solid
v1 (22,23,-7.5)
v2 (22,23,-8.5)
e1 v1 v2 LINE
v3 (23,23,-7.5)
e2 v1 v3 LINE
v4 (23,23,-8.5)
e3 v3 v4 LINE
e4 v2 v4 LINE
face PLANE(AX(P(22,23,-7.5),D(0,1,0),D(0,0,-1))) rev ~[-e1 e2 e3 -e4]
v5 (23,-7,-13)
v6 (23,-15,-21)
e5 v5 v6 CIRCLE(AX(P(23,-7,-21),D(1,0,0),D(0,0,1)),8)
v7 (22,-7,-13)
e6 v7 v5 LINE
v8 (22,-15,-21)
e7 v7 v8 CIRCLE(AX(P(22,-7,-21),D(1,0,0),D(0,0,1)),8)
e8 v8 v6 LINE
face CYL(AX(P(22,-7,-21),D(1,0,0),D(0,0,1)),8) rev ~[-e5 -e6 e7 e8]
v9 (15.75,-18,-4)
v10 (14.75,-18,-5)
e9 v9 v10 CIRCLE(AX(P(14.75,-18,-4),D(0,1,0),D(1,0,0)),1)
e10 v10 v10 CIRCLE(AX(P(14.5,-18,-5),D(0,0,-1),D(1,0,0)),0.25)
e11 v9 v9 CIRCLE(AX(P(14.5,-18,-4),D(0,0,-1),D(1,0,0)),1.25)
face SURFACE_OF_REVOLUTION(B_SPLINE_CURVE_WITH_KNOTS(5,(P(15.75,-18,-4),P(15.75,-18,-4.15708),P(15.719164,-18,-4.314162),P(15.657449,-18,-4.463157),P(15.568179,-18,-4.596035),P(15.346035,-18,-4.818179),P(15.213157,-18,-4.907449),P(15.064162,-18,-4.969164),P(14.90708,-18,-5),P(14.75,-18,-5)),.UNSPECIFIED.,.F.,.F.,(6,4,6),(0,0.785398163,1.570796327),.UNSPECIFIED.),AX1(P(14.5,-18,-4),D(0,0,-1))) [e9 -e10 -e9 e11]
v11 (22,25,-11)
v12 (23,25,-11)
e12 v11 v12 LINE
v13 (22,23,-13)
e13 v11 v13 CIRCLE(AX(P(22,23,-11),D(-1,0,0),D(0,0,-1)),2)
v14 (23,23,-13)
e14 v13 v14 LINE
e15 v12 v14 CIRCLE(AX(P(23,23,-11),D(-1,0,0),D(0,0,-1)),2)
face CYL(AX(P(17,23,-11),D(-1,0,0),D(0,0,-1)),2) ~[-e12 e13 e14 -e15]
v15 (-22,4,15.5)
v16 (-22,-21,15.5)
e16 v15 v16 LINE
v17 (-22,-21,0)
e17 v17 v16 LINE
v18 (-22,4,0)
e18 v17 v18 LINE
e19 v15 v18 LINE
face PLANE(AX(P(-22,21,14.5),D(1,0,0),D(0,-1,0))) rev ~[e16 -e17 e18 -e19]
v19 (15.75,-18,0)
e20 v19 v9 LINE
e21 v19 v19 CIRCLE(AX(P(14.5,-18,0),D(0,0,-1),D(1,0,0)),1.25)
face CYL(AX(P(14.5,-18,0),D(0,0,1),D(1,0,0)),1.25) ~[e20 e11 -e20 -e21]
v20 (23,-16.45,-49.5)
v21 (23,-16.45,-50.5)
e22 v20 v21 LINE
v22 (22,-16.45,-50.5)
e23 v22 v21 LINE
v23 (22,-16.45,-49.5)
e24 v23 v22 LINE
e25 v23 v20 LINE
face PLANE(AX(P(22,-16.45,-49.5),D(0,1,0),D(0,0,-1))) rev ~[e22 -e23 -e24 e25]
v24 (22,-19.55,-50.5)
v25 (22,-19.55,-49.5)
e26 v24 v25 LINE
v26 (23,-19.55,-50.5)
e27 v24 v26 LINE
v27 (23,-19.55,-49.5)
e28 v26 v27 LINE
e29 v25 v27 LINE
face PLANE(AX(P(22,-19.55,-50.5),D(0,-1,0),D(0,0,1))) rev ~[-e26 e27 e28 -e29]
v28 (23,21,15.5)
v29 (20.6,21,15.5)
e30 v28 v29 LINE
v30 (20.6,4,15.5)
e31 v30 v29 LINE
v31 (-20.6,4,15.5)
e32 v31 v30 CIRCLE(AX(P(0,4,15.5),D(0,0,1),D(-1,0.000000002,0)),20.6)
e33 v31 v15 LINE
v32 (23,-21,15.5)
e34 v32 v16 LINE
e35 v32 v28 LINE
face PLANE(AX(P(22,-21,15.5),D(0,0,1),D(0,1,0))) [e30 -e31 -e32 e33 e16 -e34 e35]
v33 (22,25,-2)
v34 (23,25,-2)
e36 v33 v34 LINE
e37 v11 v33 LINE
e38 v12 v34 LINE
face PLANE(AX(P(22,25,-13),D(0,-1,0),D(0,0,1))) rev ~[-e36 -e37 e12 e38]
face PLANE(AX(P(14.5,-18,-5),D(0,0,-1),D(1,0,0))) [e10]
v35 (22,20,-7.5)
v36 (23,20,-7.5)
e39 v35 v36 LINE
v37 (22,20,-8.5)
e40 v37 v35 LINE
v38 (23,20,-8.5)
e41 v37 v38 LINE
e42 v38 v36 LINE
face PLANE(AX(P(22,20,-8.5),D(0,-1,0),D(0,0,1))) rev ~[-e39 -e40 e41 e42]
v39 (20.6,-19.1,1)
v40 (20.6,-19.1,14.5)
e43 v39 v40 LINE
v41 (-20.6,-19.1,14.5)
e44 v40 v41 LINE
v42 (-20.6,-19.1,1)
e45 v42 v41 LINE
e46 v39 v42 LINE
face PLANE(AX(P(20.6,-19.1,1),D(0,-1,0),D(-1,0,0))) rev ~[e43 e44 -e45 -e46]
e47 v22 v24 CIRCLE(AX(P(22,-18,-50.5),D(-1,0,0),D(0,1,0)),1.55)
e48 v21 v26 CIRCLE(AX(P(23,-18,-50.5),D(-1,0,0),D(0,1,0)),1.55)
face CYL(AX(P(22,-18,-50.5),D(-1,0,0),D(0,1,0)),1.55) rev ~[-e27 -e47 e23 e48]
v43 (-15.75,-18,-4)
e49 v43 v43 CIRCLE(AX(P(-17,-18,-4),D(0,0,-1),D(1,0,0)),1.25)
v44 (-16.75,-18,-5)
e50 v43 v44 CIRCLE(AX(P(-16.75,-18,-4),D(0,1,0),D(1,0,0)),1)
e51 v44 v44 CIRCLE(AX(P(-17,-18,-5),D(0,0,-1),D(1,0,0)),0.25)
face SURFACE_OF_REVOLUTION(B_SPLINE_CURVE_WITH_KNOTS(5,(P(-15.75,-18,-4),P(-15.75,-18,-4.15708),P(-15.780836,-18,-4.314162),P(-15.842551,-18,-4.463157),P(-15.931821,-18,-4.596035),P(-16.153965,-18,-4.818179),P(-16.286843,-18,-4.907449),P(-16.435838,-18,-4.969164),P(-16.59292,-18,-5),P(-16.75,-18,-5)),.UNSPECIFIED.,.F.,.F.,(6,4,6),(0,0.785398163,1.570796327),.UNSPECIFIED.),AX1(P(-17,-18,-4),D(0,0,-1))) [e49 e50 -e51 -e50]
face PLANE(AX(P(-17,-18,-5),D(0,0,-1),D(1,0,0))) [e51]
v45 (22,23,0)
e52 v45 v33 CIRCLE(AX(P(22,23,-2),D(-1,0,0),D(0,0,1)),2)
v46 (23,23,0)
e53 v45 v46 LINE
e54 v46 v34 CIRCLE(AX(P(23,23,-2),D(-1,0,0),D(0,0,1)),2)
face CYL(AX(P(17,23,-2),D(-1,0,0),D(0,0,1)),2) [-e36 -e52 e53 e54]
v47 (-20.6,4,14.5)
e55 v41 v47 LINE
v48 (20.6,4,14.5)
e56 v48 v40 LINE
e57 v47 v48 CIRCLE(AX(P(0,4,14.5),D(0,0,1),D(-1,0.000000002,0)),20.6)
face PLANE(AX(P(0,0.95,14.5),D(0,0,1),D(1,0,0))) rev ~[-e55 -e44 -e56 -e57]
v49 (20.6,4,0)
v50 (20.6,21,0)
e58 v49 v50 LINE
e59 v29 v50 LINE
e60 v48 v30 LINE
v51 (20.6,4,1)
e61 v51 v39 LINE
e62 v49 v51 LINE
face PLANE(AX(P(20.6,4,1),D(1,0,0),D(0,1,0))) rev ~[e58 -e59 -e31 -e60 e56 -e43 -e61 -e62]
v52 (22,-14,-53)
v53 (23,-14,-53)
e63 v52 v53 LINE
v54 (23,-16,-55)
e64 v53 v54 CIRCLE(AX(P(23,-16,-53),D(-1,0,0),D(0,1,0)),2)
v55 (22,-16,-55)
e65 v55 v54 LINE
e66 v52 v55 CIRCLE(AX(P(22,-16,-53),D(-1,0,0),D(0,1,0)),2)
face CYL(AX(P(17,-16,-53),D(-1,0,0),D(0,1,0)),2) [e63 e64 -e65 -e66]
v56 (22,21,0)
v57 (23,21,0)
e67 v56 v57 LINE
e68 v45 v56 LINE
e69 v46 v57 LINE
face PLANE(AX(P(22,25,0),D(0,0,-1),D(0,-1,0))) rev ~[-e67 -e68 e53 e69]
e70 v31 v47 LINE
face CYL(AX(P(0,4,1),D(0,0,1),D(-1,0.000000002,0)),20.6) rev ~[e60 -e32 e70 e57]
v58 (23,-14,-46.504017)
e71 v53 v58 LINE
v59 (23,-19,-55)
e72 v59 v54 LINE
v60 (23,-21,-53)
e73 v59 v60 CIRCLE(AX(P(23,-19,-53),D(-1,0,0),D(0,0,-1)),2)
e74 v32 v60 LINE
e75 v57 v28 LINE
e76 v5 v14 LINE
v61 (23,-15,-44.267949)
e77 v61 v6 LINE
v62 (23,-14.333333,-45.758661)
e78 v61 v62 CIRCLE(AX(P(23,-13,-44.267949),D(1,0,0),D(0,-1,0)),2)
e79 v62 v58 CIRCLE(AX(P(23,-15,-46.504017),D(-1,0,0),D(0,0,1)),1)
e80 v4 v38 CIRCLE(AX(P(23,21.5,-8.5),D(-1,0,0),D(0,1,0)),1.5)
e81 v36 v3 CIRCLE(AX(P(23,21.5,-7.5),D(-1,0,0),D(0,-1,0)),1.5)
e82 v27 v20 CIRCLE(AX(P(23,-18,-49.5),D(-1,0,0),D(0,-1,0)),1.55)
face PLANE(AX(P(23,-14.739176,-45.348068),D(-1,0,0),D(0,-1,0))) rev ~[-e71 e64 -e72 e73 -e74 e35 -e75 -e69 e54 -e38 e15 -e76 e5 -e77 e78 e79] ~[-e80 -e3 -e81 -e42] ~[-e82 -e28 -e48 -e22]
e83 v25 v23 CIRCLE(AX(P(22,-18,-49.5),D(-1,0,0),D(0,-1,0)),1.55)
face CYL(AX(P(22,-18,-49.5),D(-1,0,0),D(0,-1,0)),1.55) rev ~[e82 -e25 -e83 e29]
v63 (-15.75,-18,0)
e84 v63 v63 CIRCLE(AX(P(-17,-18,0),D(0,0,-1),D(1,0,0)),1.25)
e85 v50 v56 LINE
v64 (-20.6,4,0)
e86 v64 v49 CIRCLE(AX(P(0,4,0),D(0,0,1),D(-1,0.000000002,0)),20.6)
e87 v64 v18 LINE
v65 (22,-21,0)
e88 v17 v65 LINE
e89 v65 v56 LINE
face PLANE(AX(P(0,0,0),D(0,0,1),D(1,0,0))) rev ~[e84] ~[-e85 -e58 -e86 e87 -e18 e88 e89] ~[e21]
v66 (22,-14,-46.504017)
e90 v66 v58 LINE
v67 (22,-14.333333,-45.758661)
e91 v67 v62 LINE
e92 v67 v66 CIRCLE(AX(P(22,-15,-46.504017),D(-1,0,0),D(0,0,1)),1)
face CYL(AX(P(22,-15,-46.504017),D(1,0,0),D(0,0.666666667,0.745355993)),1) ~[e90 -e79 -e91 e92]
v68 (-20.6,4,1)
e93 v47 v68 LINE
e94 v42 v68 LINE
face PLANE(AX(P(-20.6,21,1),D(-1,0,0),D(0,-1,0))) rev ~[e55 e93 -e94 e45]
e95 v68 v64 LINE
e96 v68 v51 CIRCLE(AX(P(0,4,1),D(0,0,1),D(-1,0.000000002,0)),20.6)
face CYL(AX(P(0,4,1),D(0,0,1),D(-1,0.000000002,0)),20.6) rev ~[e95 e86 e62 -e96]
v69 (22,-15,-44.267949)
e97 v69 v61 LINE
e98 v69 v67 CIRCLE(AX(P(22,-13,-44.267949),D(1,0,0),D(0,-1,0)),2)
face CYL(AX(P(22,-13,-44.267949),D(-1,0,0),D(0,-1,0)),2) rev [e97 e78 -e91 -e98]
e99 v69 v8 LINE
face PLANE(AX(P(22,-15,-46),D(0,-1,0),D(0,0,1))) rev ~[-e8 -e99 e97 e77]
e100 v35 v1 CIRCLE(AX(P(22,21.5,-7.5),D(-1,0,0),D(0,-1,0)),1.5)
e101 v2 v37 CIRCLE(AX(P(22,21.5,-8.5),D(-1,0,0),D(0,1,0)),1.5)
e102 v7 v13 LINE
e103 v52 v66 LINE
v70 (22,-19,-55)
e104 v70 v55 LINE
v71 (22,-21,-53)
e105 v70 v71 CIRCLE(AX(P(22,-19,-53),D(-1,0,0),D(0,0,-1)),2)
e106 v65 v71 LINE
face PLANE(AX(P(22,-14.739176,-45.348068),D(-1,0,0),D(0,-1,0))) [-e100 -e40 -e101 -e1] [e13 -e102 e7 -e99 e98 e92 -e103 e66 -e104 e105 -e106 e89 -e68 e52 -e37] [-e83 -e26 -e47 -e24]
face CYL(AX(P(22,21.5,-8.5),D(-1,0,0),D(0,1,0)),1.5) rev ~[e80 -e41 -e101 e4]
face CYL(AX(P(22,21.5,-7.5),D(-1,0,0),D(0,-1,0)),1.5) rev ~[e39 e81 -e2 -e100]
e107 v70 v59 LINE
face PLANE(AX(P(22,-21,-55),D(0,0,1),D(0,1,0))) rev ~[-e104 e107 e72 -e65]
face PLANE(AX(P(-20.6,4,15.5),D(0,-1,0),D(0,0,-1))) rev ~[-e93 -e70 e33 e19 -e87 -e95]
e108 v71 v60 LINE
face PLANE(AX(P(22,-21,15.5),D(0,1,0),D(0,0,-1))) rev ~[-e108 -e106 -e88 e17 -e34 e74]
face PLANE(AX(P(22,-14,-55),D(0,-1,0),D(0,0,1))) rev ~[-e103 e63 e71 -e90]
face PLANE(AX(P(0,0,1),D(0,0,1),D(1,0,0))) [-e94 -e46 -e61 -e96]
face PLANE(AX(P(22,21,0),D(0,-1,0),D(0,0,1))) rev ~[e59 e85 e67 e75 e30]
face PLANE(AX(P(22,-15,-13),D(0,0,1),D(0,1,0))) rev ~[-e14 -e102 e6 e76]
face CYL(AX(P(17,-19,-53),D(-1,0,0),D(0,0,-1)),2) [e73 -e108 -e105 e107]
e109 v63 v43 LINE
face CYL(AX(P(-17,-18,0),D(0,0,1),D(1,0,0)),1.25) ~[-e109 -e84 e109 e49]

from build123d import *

# Parameters (mm, degrees)
F0_W         = 44
F0_H         = 42
F1_DEPTH     = 1
F3_DEPTH     = 13.5
F4_W         = 41.2
F4_H         = 40.1
F5_DEPTH     = 1
F7_DEPTH     = 25
F9_DEPTH     = 1
F11_DEPTH    = 25
F12_W        = 42
F12_H        = 15.5
F12_W_2      = 1
F12_H_2      = 9
F13_DEPTH    = 1
F14_DEPTH    = 25
F15_R        = 8
F16_T1_DEPTH = 1
F16_T3_DEPTH = 11
F16_T5_DEPTH = 11
F16_T7_DEPTH = 11
F16_T9_DEPTH = 11
F8_R         = 1.25
F17_DEPTH    = 5
F18_R        = 1


# Not quite as in the source:
# - a fillet or chamfer that OpenCascade refuses, or shapes differently, is made with other operations: its cross-section is extruded or revolved along the edge and cut away or added
# - a feature names something its author has since deleted; it is built from what else it names


with BuildPart() as f1:
    # F0 (on Top) → F1 (new body)
    with BuildSketch(Plane.XY):
        Rectangle(F0_W, F0_H)
    extrude(amount=F1_DEPTH)

    # F2 (on face) → F3 (join)
    with BuildSketch(Plane.XY.offset(1)):
        Polygon((-20.6, -19.1), (-20.6, 21), (-22, 21), (-22, -21), (22, -21), (22, 21), (20.6, 21), (20.6, -19.1), align=None)
    extrude(amount=F3_DEPTH)

    # F4 (on face) → F5 (join)
    with BuildSketch(Plane.XY.offset(14.5)):
        with Locations((0, 0.95)):
            Rectangle(F4_W, F4_H)
        Polygon((-22, 21), (-22, -21), (22, -21), (22, 21), (20.6, 21), (20.6, -19.1), (-20.6, -19.1), (-20.6, 21), align=None)
    extrude(amount=F5_DEPTH)

    # F6 (on face) → F7 (cut, symmetric)
    with BuildSketch(Plane.XY.offset(1)):
        with BuildLine():
            ThreePointArc((-20.6, 4.0000000362), (-1.81e-08, -16.6), (20.6, 4))
            ThreePointArc((20.6, 4), (18.2212690578, 13.6096490011), (11.6344316578, 21))
            Line((11.6344316578, 21), (-11.6344316578, 21))
            ThreePointArc((-11.6344316578, 21), (-18.2212690493, 13.6096490171), (-20.6, 4.0000000362))
        make_face()
        with BuildLine():
            Line((-20.6, 21), (-20.6, 4.0000000362))
            ThreePointArc((-20.6, 4.0000000362), (-18.2212690493, 13.6096490171), (-11.6344316578, 21))
            Line((-11.6344316578, 21), (-20.6, 21))
        make_face()
        with BuildLine():
            ThreePointArc((11.6344316578, 21), (18.2212690578, 13.6096490011), (20.6, 4))
            Line((20.6, 4), (20.6, 21))
            Line((20.6, 21), (11.6344316578, 21))
        make_face()
    extrude(amount=F7_DEPTH, both=True, mode=Mode.SUBTRACT)

    # F4 (on face) → F9 (join)
    with BuildSketch(Plane.XY.offset(14.5)):
        Polygon((-22, 21), (-22, -21), (22, -21), (22, 21), (20.6, 21), (20.6, -19.1), (-20.6, -19.1), (-20.6, 21), align=None)
    extrude(amount=F9_DEPTH)

    # F10 (on face) → F11 (cut)
    with BuildSketch(Plane.YZ.offset(-20.6)):
        Polygon((21, 0), (21, 15), (21, 15.5), (4, 15.5), (4, 14.5), (4, 1), (4, 0), align=None)
    extrude(amount=-F11_DEPTH, mode=Mode.SUBTRACT)

    # F12 (on face) → F13 (join)
    with BuildSketch(Plane.YZ.offset(22)):
        Polygon((21, 0), (-21, 0), (-21, -13), (-15, -13), (25, -13), (25, 0), align=None)
        with BuildLine():
            Line((23, -7.5), (23, -8.5))
            ThreePointArc((23, -8.5), (21.5, -10), (20, -8.5))
            Line((20, -8.5), (20, -7.5))
            ThreePointArc((20, -7.5), (21.5, -6), (23, -7.5))
        make_face(mode=Mode.SUBTRACT)
        Polygon((-15, -13), (-21, -13), (-21, -55), (-15, -55), (-15, -46), align=None)
        with BuildLine():
            Line((-16.45, -49.5), (-16.45, -50.5))
            ThreePointArc((-16.45, -50.5), (-18, -52.05), (-19.55, -50.5))
            Line((-19.55, -50.5), (-19.55, -49.5))
            ThreePointArc((-19.55, -49.5), (-18, -47.95), (-16.45, -49.5))
        make_face(mode=Mode.SUBTRACT)
        with Locations((0, 7.75)):
            Rectangle(F12_W, F12_H)
        with Locations((-14.5, -50.5)):
            Rectangle(F12_W_2, F12_H_2)
    extrude(amount=F13_DEPTH)

    # F12 (on face) → F14 (cut)
    with BuildSketch(Plane.YZ.offset(22)):
        with BuildLine():
            ThreePointArc((-19.55, -50.5), (-18, -52.05), (-16.45, -50.5))
            Line((-16.45, -50.5), (-16.8157280718, -50.5))
            ThreePointArc((-16.8157280718, -50.5), (-18, -51.05), (-19.1842719282, -50.5))
            Line((-19.1842719282, -50.5), (-19.55, -50.5))
        make_face()
        with BuildLine():
            Line((-16.8157280718, -50.5), (-16.45, -50.5))
            ThreePointArc((-16.45, -50.5), (-16.4708552854, -50.2465903676), (-16.5328599249, -50))
            ThreePointArc((-16.5328599249, -50), (-16.6509275769, -50.2632192327), (-16.8157280718, -50.5))
        make_face()
        with BuildLine():
            ThreePointArc((-16.5328599249, -50), (-16.4708552854, -50.2465903676), (-16.45, -50.5))
            Line((-16.45, -50.5), (-16.45, -49.5))
            ThreePointArc((-16.45, -49.5), (-16.4708552854, -49.7534096324), (-16.5328599249, -50))
        make_face()
        with BuildLine():
            ThreePointArc((-16.5328599249, -50), (-16.4708552854, -49.7534096324), (-16.45, -49.5))
            Line((-16.45, -49.5), (-16.8157280718, -49.5))
            ThreePointArc((-16.8157280718, -49.5), (-16.6509275769, -49.7367807673), (-16.5328599249, -50))
        make_face()
        with BuildLine():
            Line((-16.8157280718, -49.5), (-16.45, -49.5))
            ThreePointArc((-16.45, -49.5), (-18, -47.95), (-19.55, -49.5))
            Line((-19.55, -49.5), (-19.1842719282, -49.5))
            ThreePointArc((-19.1842719282, -49.5), (-18, -48.95), (-16.8157280718, -49.5))
        make_face()
        with BuildLine():
            Line((-19.1842719282, -49.5), (-16.8157280718, -49.5))
            ThreePointArc((-16.8157280718, -49.5), (-18, -48.95), (-19.1842719282, -49.5))
        make_face()
        with BuildLine():
            Line((-19.1842719282, -50.5), (-16.8157280718, -50.5))
            ThreePointArc((-16.8157280718, -50.5), (-16.6509275769, -50.2632192327), (-16.5328599249, -50))
            ThreePointArc((-16.5328599249, -50), (-16.6509275769, -49.7367807673), (-16.8157280718, -49.5))
            Line((-16.8157280718, -49.5), (-19.1842719282, -49.5))
            ThreePointArc((-19.1842719282, -49.5), (-19.3490724231, -49.7367807673), (-19.4671400751, -50))
            ThreePointArc((-19.4671400751, -50), (-19.3490724231, -50.2632192327), (-19.1842719282, -50.5))
        make_face()
        with BuildLine():
            ThreePointArc((-19.1842719282, -50.5), (-18, -51.05), (-16.8157280718, -50.5))
            Line((-16.8157280718, -50.5), (-19.1842719282, -50.5))
        make_face()
        with BuildLine():
            ThreePointArc((-19.4671400751, -50), (-19.5291447146, -50.2465903676), (-19.55, -50.5))
            Line((-19.55, -50.5), (-19.1842719282, -50.5))
            ThreePointArc((-19.1842719282, -50.5), (-19.3490724231, -50.2632192327), (-19.4671400751, -50))
        make_face()
        with BuildLine():
            Line((-19.55, -49.5), (-19.55, -50.5))
            ThreePointArc((-19.55, -50.5), (-19.5291447146, -50.2465903676), (-19.4671400751, -50))
            ThreePointArc((-19.4671400751, -50), (-19.5291447146, -49.7534096324), (-19.55, -49.5))
        make_face()
        with BuildLine():
            Line((-19.1842719282, -49.5), (-19.55, -49.5))
            ThreePointArc((-19.55, -49.5), (-19.5291447146, -49.7534096324), (-19.4671400751, -50))
            ThreePointArc((-19.4671400751, -50), (-19.3490724231, -49.7367807673), (-19.1842719282, -49.5))
        make_face()
        with BuildLine():
            ThreePointArc((20, -8.5), (21.5, -10), (23, -8.5))
            Line((23, -8.5), (22.6180339887, -8.5))
            ThreePointArc((22.6180339887, -8.5), (21.5, -9), (20.3819660113, -8.5))
            Line((20.3819660113, -8.5), (20, -8.5))
        make_face()
        with BuildLine():
            ThreePointArc((20.0857864376, -8), (20.0216021605, -8.2463470319), (20, -8.5))
            Line((20, -8.5), (20.3819660113, -8.5))
            ThreePointArc((20.3819660113, -8.5), (20.209430585, -8.2644805982), (20.0857864376, -8))
        make_face()
        with BuildLine():
            Line((20.3819660113, -7.5), (20, -7.5))
            ThreePointArc((20, -7.5), (20.0216021605, -7.7536529681), (20.0857864376, -8))
            ThreePointArc((20.0857864376, -8), (20.209430585, -7.7355194018), (20.3819660113, -7.5))
        make_face()
        with BuildLine():
            Line((22.6180339887, -7.5), (23, -7.5))
            ThreePointArc((23, -7.5), (21.5, -6), (20, -7.5))
            Line((20, -7.5), (20.3819660113, -7.5))
            ThreePointArc((20.3819660113, -7.5), (21.5, -7), (22.6180339887, -7.5))
        make_face()
        with BuildLine():
            Line((20.3819660113, -7.5), (22.6180339887, -7.5))
            ThreePointArc((22.6180339887, -7.5), (21.5, -7), (20.3819660113, -7.5))
        make_face()
        with BuildLine():
            Line((20.3819660113, -8.5), (22.6180339887, -8.5))
            ThreePointArc((22.6180339887, -8.5), (22.790569415, -8.2644805982), (22.9142135624, -8))
            ThreePointArc((22.9142135624, -8), (22.790569415, -7.7355194018), (22.6180339887, -7.5))
            Line((22.6180339887, -7.5), (20.3819660113, -7.5))
            ThreePointArc((20.3819660113, -7.5), (20.209430585, -7.7355194018), (20.0857864376, -8))
            ThreePointArc((20.0857864376, -8), (20.209430585, -8.2644805982), (20.3819660113, -8.5))
        make_face()
        with BuildLine():
            ThreePointArc((20.3819660113, -8.5), (21.5, -9), (22.6180339887, -8.5))
            Line((22.6180339887, -8.5), (20.3819660113, -8.5))
        make_face()
        with BuildLine():
            ThreePointArc((22.9142135624, -8), (22.9783978395, -8.2463470319), (23, -8.5))
            Line((23, -8.5), (23, -7.5))
            ThreePointArc((23, -7.5), (22.9783978395, -7.7536529681), (22.9142135624, -8))
        make_face()
        with BuildLine():
            ThreePointArc((22.9142135624, -8), (22.9783978395, -7.7536529681), (23, -7.5))
            Line((23, -7.5), (22.6180339887, -7.5))
            ThreePointArc((22.6180339887, -7.5), (22.790569415, -7.7355194018), (22.9142135624, -8))
        make_face()
        with BuildLine():
            Line((22.6180339887, -8.5), (23, -8.5))
            ThreePointArc((23, -8.5), (22.9783978395, -8.2463470319), (22.9142135624, -8))
            ThreePointArc((22.9142135624, -8), (22.790569415, -8.2644805982), (22.6180339887, -8.5))
        make_face()
        with BuildLine():
            Line((20, -7.5), (20, -8.5))
            ThreePointArc((20, -8.5), (20.0216021605, -8.2463470319), (20.0857864376, -8))
            ThreePointArc((20.0857864376, -8), (20.0216021605, -7.7536529681), (20, -7.5))
        make_face()
    extrude(amount=-F14_DEPTH, mode=Mode.SUBTRACT)

    # F15
    f15_edges = [f1.edges().sort_by_distance(p)[0] for p in [
        (22.5, -15, -13),
    ]]
    fillet(f15_edges, radius=F15_R)

    # F16: fillet of radius 2 on 5 edges, made by hand

    # F16_s2 → F16_t1 (join)
    with BuildSketch(Plane.YZ.offset(22)):
        with BuildLine():
            ThreePointArc((-15, -44.2679491924), (-14.7320508076, -45.2679491924), (-14, -46))
            Line((-14, -46), (-15, -46))
            Line((-15, -46), (-15, -44.2679491924))
        make_face()
    extrude(amount=F16_T1_DEPTH)

    # F16_s4 → F16_t3 (cut)
    with BuildSketch(Plane.YZ.offset(17)):
        with BuildLine():
            ThreePointArc((23, -13), (24.4142135624, -12.4142135624), (25, -11))
            Line((25, -11), (25, -13))
            Line((25, -13), (23, -13))
        make_face()
    extrude(amount=F16_T3_DEPTH, mode=Mode.SUBTRACT)

    # F16_s6 → F16_t5 (cut)
    with BuildSketch(Plane.YZ.offset(17)):
        with BuildLine():
            ThreePointArc((23, 0), (24.4142135624, -0.5857864376), (25, -2))
            Line((25, -2), (25, 0))
            Line((25, 0), (23, 0))
        make_face()
    extrude(amount=F16_T5_DEPTH, mode=Mode.SUBTRACT)

    # F16_s8 → F16_t7 (cut)
    with BuildSketch(Plane.YZ.offset(17)):
        with BuildLine():
            ThreePointArc((-14, -53), (-14.5857864376, -54.4142135624), (-16, -55))
            Line((-16, -55), (-14, -55))
            Line((-14, -55), (-14, -53))
        make_face()
    extrude(amount=F16_T7_DEPTH, mode=Mode.SUBTRACT)

    # F16_s10 → F16_t9 (cut)
    with BuildSketch(Plane.YZ.offset(17)):
        with BuildLine():
            ThreePointArc((-19, -55), (-20.4142135624, -54.4142135624), (-21, -53))
            Line((-21, -53), (-21, -55))
            Line((-21, -55), (-19, -55))
        make_face()
    extrude(amount=F16_T9_DEPTH, mode=Mode.SUBTRACT)

    # F8 (on face) → F17 (join)
    with BuildSketch(Plane(origin=(0, 0, 0), x_dir=(1, 0, 0), z_dir=(0, 0, -1))):
        with Locations((-17, 18)):
            Circle(F8_R)
        with Locations((14.5, 18)):
            Circle(F8_R)
    extrude(amount=F17_DEPTH)

    # F18
    f18_edges = [f1.edges().sort_by_distance(p)[0] for p in [
        (-18.25, -18, -5),
        (13.25, -18, -5),
        (22.5, -14, -46),
    ]]
    fillet(f18_edges, radius=F18_R)


solid = f1.part
